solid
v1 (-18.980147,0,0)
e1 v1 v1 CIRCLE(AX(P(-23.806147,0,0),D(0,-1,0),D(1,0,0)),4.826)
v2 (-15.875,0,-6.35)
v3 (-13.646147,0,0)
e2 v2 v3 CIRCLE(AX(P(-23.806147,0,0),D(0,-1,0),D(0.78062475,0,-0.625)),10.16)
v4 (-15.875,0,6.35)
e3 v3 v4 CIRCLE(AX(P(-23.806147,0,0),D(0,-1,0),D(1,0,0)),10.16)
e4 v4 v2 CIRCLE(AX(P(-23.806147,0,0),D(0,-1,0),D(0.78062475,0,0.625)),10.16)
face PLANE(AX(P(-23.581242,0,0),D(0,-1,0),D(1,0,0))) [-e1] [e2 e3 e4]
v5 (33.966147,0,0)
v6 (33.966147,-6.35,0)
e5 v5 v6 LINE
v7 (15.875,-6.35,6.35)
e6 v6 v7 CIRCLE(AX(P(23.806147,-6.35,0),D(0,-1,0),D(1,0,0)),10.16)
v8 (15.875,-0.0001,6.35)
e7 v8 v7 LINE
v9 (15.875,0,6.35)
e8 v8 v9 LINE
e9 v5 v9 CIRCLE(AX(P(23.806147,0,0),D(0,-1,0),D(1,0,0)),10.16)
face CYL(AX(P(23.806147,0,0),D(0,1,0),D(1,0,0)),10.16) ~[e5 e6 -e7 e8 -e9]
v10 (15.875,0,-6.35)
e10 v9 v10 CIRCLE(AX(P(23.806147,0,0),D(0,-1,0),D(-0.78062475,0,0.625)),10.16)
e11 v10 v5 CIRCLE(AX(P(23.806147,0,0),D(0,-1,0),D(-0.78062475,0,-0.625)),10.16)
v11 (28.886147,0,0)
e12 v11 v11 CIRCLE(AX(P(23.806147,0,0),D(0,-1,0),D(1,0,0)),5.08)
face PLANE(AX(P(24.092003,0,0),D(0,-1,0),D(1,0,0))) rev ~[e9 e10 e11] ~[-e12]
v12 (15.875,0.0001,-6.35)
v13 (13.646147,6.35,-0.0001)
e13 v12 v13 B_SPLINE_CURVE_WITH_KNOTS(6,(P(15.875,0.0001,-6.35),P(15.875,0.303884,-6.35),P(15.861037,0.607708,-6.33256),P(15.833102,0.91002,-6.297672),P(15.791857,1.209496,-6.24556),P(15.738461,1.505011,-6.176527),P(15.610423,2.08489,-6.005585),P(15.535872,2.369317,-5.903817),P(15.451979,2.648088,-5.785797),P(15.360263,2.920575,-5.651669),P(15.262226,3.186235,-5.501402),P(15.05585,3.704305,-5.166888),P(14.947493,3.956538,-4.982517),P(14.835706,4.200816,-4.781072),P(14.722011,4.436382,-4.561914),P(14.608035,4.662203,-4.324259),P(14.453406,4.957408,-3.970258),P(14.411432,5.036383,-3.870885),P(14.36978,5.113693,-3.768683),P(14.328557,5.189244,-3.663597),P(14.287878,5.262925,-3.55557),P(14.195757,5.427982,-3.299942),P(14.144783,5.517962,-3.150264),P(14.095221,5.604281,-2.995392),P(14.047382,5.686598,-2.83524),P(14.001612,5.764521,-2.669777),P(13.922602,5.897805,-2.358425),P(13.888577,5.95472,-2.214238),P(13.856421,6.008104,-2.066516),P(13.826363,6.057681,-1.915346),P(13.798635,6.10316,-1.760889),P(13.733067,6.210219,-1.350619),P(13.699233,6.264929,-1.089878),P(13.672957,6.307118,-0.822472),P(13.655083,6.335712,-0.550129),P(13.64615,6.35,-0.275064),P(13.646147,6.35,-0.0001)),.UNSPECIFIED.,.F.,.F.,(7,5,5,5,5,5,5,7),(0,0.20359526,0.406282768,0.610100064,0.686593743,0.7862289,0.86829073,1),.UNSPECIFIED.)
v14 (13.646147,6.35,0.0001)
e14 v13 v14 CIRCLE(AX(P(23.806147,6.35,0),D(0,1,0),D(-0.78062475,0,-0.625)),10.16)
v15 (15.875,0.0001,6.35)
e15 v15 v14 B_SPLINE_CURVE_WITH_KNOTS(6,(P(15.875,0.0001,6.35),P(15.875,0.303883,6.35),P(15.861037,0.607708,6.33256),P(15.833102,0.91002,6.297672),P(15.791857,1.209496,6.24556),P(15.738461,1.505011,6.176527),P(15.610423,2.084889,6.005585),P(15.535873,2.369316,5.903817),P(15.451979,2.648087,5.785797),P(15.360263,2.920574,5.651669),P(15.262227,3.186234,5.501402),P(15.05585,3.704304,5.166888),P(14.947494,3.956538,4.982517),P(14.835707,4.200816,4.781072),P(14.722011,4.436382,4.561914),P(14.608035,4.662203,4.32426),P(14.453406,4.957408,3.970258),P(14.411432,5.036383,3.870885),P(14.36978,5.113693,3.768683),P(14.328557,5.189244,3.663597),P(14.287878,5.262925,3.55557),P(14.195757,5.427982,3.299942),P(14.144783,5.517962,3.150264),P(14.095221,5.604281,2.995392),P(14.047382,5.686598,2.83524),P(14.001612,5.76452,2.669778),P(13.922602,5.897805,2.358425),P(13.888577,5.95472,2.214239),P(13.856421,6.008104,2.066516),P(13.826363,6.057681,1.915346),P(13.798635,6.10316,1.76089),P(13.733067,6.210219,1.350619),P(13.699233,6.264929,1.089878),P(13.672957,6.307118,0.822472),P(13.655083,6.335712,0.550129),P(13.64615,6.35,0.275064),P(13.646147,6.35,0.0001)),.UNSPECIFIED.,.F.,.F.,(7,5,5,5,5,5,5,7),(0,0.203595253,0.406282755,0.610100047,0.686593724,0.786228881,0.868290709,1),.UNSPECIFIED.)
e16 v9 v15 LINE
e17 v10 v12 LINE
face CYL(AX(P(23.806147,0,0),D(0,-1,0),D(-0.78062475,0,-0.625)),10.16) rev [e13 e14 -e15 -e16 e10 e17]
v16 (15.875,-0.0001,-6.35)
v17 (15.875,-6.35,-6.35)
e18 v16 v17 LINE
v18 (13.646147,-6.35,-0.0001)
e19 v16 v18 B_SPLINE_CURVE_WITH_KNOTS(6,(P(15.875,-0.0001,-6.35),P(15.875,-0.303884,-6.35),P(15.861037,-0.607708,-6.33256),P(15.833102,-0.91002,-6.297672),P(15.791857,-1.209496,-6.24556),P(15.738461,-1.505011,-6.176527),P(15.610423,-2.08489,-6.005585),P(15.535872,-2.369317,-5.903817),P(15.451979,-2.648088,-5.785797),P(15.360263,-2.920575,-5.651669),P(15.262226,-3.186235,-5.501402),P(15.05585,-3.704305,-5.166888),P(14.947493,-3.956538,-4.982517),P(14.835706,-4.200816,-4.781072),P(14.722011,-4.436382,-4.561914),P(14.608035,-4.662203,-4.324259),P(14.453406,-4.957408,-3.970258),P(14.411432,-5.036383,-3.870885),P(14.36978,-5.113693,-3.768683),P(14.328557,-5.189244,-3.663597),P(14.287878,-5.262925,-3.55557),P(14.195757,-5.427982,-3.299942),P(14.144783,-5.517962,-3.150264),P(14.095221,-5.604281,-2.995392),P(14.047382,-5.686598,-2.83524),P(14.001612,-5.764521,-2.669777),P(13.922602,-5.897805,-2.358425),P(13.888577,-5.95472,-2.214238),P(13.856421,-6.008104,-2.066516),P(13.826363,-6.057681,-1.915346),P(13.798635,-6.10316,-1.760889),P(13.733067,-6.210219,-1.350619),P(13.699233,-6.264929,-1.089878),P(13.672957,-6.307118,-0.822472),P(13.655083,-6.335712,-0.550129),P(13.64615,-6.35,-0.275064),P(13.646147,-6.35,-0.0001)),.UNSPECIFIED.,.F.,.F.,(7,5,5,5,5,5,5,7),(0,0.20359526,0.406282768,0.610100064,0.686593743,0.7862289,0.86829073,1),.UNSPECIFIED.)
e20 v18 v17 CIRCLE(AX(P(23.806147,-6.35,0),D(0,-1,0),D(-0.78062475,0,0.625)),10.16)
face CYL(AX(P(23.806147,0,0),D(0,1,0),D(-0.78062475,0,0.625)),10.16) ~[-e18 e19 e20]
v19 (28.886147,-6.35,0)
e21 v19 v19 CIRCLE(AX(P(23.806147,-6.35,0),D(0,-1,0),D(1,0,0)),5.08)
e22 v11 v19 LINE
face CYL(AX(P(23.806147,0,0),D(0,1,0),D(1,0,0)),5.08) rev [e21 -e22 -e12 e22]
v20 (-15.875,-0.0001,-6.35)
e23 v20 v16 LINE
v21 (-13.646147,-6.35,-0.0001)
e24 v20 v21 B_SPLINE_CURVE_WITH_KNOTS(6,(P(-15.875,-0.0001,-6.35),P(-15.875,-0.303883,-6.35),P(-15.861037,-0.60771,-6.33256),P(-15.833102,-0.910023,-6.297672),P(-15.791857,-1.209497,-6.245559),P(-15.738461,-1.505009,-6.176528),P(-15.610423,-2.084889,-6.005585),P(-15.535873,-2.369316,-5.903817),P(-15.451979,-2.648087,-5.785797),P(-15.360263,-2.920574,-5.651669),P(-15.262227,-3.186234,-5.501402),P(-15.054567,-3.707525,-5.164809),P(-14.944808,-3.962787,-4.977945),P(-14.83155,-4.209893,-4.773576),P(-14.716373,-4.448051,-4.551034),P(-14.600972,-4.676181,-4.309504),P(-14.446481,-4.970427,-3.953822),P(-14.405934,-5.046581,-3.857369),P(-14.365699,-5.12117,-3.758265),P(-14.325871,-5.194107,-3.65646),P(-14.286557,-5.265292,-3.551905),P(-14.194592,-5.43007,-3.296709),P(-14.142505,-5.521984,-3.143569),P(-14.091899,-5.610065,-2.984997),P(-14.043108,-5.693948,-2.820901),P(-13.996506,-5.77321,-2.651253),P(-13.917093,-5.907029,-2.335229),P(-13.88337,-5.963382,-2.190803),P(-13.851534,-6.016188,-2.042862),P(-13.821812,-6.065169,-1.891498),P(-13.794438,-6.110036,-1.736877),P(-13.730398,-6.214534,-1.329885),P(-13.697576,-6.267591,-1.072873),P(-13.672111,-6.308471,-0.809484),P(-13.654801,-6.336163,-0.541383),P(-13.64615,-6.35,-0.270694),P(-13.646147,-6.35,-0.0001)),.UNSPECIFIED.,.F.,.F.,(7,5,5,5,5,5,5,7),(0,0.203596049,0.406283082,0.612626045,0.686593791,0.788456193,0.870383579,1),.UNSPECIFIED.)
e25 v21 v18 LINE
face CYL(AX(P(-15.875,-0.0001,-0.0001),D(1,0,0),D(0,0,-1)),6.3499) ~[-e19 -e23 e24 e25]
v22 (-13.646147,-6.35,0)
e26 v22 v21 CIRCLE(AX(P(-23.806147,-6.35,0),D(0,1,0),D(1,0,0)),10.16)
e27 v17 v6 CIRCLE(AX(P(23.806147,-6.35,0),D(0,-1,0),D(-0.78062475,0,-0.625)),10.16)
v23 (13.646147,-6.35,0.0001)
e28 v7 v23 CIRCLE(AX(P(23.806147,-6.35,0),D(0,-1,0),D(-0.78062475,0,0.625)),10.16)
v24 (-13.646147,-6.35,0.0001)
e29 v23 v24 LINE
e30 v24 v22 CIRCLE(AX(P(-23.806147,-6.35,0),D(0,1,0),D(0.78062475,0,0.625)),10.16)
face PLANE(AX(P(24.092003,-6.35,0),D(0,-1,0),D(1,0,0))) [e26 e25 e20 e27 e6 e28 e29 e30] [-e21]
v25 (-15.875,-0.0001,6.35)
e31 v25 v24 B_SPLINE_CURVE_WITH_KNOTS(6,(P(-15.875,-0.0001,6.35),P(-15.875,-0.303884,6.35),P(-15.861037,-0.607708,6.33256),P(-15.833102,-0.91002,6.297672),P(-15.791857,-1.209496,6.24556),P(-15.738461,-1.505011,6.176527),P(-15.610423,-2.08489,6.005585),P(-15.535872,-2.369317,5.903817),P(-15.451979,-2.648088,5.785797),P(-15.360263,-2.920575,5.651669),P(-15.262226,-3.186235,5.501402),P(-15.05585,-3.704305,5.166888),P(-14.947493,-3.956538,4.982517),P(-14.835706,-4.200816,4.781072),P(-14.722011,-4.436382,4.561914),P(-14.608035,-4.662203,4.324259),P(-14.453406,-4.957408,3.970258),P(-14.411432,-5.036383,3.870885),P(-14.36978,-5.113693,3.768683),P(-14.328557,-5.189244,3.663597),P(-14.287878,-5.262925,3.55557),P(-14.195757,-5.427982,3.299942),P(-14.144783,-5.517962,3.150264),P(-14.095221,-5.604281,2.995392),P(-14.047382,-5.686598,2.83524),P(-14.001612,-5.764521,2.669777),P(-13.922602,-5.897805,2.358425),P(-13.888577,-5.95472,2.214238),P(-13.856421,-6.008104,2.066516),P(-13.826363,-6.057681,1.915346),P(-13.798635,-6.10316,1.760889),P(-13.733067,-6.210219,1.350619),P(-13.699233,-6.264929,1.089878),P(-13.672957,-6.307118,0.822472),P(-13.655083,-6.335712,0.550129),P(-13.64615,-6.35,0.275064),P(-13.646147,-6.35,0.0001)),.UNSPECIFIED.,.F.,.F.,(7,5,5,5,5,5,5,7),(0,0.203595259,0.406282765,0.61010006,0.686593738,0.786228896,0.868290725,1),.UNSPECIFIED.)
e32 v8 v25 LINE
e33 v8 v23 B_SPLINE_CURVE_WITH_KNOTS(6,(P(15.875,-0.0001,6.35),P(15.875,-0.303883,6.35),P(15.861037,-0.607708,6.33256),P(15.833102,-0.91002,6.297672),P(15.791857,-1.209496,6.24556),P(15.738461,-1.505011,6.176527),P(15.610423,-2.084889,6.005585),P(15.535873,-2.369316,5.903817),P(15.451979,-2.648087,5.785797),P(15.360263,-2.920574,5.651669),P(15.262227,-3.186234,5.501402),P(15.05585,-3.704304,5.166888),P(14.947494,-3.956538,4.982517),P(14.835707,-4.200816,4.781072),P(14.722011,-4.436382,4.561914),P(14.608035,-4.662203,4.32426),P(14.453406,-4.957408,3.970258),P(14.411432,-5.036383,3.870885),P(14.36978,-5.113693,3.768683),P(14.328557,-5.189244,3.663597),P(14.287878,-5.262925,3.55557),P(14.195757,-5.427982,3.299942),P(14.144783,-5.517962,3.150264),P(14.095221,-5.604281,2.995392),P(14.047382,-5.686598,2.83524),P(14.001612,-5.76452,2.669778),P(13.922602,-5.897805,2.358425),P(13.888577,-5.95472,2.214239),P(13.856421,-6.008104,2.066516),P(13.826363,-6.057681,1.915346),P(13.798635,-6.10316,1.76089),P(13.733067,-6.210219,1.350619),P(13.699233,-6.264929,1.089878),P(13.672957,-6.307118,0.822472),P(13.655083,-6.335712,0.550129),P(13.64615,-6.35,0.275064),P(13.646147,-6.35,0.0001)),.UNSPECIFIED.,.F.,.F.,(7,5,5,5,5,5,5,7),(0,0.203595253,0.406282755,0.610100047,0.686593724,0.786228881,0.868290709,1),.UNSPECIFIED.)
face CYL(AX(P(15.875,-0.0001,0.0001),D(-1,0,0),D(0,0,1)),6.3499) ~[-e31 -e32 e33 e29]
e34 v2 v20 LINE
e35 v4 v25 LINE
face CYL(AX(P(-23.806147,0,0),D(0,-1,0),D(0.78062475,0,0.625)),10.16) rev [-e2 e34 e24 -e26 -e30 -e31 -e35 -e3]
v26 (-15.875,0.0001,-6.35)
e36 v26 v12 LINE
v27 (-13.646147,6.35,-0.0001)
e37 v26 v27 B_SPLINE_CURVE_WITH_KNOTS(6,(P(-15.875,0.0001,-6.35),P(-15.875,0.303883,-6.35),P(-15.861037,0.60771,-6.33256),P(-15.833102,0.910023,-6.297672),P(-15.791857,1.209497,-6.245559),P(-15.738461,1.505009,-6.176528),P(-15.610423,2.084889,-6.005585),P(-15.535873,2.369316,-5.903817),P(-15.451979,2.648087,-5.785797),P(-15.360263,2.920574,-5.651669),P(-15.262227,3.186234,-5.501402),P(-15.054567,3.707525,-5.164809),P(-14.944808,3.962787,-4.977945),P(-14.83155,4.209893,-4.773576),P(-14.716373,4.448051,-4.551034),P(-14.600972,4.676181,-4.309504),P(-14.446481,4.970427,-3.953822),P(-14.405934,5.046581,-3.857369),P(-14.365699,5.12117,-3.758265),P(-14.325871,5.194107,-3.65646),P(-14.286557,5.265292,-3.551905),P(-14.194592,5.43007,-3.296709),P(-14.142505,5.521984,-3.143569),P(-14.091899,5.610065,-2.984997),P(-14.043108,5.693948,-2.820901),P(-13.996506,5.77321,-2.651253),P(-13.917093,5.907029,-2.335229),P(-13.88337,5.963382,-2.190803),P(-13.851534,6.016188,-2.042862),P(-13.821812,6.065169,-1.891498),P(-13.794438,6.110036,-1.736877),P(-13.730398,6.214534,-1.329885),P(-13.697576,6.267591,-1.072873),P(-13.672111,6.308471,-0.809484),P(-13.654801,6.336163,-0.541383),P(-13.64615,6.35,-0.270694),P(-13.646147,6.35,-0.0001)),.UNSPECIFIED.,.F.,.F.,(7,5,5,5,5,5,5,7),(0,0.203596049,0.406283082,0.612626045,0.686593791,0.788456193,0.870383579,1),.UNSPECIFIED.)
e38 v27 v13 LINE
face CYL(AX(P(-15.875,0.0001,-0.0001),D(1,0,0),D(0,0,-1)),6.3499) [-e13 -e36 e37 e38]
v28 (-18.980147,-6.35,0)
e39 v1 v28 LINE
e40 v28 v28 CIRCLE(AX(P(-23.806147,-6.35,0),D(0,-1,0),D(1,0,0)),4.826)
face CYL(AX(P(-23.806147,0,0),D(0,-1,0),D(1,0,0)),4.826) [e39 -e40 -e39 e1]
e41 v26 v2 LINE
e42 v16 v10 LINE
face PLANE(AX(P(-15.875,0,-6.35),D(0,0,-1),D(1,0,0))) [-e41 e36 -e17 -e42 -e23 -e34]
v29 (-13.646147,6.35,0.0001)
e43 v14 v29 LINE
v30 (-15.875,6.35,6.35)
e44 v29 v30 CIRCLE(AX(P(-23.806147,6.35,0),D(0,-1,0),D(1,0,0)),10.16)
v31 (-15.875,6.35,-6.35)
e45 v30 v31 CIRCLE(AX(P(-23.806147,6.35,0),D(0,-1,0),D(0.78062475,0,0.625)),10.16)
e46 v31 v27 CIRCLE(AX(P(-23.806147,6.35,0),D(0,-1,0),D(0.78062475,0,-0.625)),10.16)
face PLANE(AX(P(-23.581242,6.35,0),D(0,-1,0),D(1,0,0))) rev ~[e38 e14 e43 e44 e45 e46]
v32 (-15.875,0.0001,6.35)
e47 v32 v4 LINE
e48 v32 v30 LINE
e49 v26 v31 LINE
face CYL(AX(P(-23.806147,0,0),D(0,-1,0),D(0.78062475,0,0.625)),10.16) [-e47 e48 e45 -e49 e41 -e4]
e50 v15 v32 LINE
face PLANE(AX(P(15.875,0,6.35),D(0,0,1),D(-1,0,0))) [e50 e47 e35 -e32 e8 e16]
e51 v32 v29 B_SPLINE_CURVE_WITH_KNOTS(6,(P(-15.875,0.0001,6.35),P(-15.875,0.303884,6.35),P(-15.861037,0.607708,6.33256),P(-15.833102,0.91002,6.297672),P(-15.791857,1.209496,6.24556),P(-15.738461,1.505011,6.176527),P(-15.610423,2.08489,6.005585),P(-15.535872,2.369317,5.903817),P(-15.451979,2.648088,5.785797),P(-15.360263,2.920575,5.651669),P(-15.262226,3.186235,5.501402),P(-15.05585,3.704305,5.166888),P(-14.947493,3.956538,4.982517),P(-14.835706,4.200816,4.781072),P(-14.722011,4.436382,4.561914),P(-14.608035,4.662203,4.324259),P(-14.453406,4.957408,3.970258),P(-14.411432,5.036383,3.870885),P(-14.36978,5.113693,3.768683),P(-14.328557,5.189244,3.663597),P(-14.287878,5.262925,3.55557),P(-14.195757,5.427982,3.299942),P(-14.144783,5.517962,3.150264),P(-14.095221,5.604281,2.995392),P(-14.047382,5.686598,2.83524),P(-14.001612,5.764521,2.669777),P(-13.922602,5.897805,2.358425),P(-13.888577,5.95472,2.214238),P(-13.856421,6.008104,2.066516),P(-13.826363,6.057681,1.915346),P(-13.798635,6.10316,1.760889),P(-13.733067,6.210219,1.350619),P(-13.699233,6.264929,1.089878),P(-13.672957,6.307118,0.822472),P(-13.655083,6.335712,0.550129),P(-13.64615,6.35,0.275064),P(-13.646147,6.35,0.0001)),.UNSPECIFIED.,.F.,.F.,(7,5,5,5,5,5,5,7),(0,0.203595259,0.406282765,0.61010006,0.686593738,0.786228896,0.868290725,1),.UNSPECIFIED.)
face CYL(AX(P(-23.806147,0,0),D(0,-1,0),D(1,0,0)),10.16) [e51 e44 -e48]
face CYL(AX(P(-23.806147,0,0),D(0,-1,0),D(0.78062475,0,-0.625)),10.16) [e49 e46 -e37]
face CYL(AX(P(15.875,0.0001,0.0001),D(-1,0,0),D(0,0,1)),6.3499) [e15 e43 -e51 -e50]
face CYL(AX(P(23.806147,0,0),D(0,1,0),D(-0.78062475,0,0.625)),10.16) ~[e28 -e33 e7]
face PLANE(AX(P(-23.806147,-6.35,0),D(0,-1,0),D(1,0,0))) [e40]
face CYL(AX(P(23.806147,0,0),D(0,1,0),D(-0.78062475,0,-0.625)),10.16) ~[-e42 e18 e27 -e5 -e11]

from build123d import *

# Parameters (mm, degrees)
F1_DEPTH = 6.35
F2_R     = 6.3499
F0_R     = 5.08
F3_DEPTH = 6.35
F0_R_2   = 4.826
F4_DEPTH = 6.35
F5_DEPTH = 6.35


# Not quite as in the source:
# - a fillet or chamfer is up to 0.001 mm smaller than in the source, because OpenCascade refuses the exact size


with BuildPart() as f1:
    # F0 (on Front) → F1 (new body, symmetric)
    with BuildSketch(Plane.XZ):
        with BuildLine():
            Line((15.875, 6.35), (-15.875, 6.35))
            ThreePointArc((-15.875, 6.35), (-14.2195407024, 3.3649028089), (-13.646147458, 0))
            ThreePointArc((-13.646147458, 0), (-14.2195407024, -3.3649028089), (-15.875, -6.35))
            Line((-15.875, -6.35), (15.875, -6.35))
            ThreePointArc((15.875, -6.35), (13.646147458, 0), (15.875, 6.35))
        make_face()
    extrude(amount=F1_DEPTH, both=True)

    # F2 (radius 6.35 in the source; OpenCascade refuses exactly that, so slightly less here)
    f2_edges = [f1.edges().sort_by_distance(p)[0] for p in [
        (0, -6.35, 6.35),
        (0, 6.35, 6.35),
        (0, -6.35, -6.35),
        (0, 6.35, -6.35),
    ]]
    fillet(f2_edges, radius=F2_R)

    # F0 (on Front) → F3 (join)
    with BuildSketch(Plane.XZ):
        with BuildLine():
            ThreePointArc((33.966147458, 0), (27.1710502669, 9.5866067556), (15.875, 6.35))
            Line((15.875, 6.35), (15.875, -6.35))
            ThreePointArc((15.875, -6.35), (27.1710502669, -9.5866067556), (33.966147458, 0))
        make_face()
        with Locations((23.806147458, 0)):
            Circle(F0_R, mode=Mode.SUBTRACT)
        with BuildLine():
            Line((15.875, -6.35), (15.875, 6.35))
            ThreePointArc((15.875, 6.35), (13.646147458, 0), (15.875, -6.35))
        make_face()
    extrude(amount=F3_DEPTH)

    # F0 (on Front) → F4 (join)
    with BuildSketch(Plane.XZ):
        with BuildLine():
            Line((-15.875, -6.35), (-15.875, 6.35))
            ThreePointArc((-15.875, 6.35), (-33.966147458, 0), (-15.875, -6.35))
        make_face()
        with Locations((-23.806147458, 0)):
            Circle(F0_R_2, mode=Mode.SUBTRACT)
        with BuildLine():
            ThreePointArc((-13.646147458, 0), (-14.2195407024, 3.3649028089), (-15.875, 6.35))
            Line((-15.875, 6.35), (-15.875, -6.35))
            ThreePointArc((-15.875, -6.35), (-14.2195407024, -3.3649028089), (-13.646147458, 0))
        make_face()
    extrude(amount=-F4_DEPTH)

    # F0 (on Front) → F5 (join, symmetric)
    with BuildSketch(Plane.XZ):
        with Locations((-23.806147458, 0)):
            Circle(F0_R_2)
    extrude(amount=F5_DEPTH, both=True)


solid = f1.part
